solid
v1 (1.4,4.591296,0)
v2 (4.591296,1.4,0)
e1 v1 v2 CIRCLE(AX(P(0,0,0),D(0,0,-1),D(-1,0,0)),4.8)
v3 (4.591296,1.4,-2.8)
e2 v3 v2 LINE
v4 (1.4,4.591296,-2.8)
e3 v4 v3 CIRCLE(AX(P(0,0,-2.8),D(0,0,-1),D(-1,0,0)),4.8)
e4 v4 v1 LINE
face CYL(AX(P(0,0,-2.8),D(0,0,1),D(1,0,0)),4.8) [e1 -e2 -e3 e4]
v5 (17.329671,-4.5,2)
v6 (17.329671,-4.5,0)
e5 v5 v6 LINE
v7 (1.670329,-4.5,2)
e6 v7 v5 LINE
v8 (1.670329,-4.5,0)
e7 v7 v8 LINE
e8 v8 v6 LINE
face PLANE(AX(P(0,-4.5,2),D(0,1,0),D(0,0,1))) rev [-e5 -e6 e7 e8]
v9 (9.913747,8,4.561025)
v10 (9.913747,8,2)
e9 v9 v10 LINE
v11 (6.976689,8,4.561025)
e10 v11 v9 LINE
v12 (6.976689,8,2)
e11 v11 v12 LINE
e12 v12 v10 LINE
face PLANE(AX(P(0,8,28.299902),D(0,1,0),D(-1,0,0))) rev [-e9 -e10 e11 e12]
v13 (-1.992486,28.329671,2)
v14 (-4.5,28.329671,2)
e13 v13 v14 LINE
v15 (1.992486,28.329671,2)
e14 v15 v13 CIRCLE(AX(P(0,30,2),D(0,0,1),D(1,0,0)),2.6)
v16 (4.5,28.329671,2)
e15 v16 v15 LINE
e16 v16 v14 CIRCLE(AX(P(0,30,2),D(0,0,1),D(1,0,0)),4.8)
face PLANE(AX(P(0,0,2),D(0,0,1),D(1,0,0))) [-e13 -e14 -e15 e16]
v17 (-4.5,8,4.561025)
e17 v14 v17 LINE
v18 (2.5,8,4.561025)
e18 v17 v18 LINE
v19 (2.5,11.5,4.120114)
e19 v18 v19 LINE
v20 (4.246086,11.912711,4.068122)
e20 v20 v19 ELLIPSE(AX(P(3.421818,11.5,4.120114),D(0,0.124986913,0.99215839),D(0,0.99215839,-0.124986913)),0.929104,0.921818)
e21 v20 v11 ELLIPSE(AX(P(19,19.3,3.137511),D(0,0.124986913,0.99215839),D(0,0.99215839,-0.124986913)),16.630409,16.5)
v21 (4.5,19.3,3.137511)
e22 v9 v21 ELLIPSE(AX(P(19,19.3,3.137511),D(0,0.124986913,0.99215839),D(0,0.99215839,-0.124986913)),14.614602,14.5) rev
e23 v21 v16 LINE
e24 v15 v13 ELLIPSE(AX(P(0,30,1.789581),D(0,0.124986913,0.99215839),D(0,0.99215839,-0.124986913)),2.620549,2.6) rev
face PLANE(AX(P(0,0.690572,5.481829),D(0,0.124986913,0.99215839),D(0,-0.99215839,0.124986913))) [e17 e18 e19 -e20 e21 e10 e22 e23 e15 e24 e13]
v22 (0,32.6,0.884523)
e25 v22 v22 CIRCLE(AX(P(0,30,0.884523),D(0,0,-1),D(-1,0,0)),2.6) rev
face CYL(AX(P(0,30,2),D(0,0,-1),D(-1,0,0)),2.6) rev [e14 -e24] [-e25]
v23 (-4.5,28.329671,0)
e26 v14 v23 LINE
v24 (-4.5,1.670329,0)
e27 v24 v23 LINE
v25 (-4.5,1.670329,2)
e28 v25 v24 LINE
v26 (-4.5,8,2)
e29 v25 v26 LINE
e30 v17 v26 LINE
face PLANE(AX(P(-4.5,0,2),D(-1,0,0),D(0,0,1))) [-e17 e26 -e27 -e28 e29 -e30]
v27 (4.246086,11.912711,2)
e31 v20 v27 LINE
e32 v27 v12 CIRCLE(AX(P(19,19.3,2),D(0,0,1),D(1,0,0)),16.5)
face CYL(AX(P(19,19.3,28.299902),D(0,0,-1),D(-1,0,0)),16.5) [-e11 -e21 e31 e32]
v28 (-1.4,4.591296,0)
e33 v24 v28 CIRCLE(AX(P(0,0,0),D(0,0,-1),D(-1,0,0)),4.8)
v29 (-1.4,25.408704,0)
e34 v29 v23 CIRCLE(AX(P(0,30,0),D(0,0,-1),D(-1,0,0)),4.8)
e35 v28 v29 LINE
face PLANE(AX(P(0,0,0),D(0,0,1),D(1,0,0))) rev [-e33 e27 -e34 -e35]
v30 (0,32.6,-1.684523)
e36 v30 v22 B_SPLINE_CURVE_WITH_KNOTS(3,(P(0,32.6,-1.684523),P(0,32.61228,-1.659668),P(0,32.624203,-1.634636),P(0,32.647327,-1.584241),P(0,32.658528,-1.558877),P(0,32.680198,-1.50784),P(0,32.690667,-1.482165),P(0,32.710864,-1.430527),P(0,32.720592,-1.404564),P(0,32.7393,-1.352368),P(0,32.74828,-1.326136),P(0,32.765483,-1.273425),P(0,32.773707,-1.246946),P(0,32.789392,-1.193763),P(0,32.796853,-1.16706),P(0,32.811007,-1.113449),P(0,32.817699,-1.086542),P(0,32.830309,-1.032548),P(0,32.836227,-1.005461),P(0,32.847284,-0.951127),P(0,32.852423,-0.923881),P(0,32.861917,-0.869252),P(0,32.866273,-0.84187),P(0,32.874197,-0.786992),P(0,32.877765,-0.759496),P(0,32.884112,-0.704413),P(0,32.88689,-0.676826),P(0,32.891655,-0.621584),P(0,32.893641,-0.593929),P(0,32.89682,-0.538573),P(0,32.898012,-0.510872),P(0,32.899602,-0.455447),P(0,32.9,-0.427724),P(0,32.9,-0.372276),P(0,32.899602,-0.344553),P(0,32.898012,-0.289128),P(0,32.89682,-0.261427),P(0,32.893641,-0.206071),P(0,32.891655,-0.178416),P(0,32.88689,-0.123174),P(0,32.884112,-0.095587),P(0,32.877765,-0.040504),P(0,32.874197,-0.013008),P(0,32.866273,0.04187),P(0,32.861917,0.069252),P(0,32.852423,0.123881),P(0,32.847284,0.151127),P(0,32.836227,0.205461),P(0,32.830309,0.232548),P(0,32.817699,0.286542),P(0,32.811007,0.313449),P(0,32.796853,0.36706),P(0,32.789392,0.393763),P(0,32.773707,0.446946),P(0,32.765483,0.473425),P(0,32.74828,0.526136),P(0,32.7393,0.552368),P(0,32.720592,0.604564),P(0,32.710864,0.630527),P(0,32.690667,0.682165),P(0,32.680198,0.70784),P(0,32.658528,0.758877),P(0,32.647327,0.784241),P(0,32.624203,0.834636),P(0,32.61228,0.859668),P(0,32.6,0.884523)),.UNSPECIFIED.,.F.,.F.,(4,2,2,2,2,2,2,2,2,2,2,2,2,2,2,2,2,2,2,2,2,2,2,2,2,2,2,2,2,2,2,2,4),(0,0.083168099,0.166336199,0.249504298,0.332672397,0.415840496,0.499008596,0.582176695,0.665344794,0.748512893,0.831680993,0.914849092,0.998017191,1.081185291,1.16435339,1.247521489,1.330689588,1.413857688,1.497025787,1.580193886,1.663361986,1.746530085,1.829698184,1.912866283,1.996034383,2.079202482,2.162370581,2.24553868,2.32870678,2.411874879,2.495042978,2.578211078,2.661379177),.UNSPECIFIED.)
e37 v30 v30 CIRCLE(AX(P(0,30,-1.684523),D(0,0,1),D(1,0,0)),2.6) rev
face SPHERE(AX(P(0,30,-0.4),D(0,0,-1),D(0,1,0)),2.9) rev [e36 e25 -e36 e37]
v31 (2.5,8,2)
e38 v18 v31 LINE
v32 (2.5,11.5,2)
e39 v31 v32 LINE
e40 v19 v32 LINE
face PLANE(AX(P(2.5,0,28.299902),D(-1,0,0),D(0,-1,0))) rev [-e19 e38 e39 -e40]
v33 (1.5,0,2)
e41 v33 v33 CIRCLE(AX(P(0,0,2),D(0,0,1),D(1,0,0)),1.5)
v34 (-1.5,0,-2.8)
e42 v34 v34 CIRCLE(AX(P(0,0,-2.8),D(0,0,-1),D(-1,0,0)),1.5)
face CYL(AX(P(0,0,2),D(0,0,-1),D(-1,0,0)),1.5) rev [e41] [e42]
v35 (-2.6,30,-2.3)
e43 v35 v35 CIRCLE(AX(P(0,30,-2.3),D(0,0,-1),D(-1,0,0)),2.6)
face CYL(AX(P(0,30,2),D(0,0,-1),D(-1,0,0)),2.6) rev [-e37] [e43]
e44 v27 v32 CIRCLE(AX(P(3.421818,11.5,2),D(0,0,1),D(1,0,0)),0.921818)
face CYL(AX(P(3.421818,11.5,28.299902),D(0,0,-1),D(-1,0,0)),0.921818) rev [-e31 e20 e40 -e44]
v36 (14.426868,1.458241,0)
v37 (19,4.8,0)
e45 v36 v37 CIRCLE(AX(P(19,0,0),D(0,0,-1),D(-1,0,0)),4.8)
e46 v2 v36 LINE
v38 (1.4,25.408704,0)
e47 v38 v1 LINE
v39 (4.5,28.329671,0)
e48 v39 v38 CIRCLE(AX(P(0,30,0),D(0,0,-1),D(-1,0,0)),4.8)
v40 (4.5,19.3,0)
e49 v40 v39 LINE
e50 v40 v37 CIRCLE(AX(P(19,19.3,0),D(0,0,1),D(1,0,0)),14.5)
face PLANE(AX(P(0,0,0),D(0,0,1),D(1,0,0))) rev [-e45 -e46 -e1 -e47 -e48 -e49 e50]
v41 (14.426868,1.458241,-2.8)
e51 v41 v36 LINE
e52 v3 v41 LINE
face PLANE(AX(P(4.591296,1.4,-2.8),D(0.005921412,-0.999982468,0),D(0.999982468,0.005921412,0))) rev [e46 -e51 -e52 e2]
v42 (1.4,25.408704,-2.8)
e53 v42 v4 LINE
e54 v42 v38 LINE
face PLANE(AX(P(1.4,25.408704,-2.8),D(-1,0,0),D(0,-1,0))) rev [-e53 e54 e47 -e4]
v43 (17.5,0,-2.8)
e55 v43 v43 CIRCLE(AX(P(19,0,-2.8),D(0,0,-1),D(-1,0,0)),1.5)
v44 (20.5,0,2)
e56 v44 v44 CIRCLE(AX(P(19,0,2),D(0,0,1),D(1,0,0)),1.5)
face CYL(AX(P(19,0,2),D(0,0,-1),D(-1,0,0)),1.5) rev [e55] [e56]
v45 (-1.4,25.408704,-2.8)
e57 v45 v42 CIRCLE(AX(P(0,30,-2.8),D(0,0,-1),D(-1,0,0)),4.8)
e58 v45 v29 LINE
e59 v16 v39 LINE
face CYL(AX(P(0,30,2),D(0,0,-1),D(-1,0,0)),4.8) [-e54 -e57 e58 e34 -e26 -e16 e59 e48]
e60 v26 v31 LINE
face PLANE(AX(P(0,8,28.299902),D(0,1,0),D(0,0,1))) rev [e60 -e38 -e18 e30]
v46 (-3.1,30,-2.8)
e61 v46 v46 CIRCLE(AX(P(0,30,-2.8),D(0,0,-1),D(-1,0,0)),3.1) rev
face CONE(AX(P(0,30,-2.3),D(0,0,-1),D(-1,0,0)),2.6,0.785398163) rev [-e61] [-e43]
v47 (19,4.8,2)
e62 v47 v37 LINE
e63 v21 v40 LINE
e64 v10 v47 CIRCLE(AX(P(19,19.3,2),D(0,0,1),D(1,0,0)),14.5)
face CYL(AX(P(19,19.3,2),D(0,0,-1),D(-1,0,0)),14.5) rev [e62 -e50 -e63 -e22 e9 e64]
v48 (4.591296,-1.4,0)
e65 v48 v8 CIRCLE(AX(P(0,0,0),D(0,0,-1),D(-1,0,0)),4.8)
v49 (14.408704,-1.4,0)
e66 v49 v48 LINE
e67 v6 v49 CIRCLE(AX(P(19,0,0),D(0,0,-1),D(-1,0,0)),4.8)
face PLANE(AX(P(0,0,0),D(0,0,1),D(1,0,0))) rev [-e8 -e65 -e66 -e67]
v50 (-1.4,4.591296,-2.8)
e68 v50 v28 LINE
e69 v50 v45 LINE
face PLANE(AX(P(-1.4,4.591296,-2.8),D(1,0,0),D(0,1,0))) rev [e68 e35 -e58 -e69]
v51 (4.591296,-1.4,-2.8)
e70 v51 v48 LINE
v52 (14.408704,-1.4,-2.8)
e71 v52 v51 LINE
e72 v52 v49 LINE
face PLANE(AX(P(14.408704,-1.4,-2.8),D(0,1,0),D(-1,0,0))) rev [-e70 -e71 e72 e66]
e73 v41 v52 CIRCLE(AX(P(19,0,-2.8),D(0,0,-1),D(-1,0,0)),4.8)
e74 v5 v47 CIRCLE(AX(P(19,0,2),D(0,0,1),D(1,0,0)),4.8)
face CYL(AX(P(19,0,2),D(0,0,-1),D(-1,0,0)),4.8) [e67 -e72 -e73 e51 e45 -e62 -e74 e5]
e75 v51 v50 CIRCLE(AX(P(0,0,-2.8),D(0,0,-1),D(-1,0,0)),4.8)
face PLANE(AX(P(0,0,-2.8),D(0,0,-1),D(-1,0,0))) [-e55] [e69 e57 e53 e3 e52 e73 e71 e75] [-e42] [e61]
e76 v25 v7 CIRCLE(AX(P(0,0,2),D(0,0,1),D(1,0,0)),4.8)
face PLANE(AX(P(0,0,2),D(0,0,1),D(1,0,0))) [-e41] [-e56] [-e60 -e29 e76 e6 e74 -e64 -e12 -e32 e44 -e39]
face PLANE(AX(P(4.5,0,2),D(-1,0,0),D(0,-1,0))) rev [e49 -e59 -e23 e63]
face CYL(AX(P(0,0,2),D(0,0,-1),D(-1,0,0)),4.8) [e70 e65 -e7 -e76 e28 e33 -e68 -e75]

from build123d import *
from build123d.topology import SkipClean

# Parameters (mm, degrees)
SKETCH_1_R            = 1.5
SKETCH_1_R_2          = 2.6
EXTRUDE_1_DEPTH       = 2
EXTRUDE_START         = 2.8
SKETCH_7_R            = 1.5
SKETCH_7_R_2          = 2.6
EXTRUDE_4_DEPTH       = 2.8
EXTRUDE_START_2       = -4.5
EXTRUDE_5_DEPTH       = 7
EXTRUDE_START_3       = 2.5
EXTRUDE_5_2_DEPTH     = 7.413746647
EXTRUDE_START_4       = 2
EXTRUDE_5_3_OUTLINE_R = 1.5
EXTRUDE_5_3_DEPTH     = 4
CHAMFER_1_SIZE        = 0.5


with BuildPart() as part:
    # 草图1 → 凸台-拉伸1 (new body)
    with BuildSketch(Plane.XY):
        with BuildLine():
            Line((4.5, 19.3), (4.5, 28.329670691))
            ThreePointArc((4.5, 28.329670691), (0, 34.8), (-4.5, 28.329670691))
            Line((-4.5, 28.329670691), (-4.5, 1.670329309))
            ThreePointArc((-4.5, 1.670329309), (-3.39411255, -3.39411255), (1.670329309, -4.5))
            Line((1.670329309, -4.5), (17.329670691, -4.5))
            ThreePointArc((17.329670691, -4.5), (23.724404724, -0.848528137), (19, 4.8))
            ThreePointArc((19, 4.8), (8.746951673, 9.046951673), (4.5, 19.3))
        make_face()
        Circle(SKETCH_1_R, mode=Mode.SUBTRACT)
        with Locations((19, 0)):
            Circle(SKETCH_1_R, mode=Mode.SUBTRACT)
        with Locations((0, 30)):
            Circle(SKETCH_1_R_2, mode=Mode.SUBTRACT)
    extrude(amount=EXTRUDE_1_DEPTH)

    # 草图7 → 凸台-拉伸4 (add)
    with BuildSketch(Plane(origin=(0, 0, 0), x_dir=(-1, 0, 0), z_dir=(0, 0, -1)).offset(EXTRUDE_START)):
        with BuildLine():
            Line((-14.408703887, -1.4), (-4.591296113, -1.4))
            ThreePointArc((-4.591296113, -1.4), (3.39411255, -3.39411255), (1.4, 4.591296113))
            Line((1.4, 4.591296113), (1.4, 25.408703887))
            ThreePointArc((1.4, 25.408703887), (0, 34.8), (-1.4, 25.408703887))
            Line((-1.4, 25.408703887), (-1.4, 4.591296113))
            ThreePointArc((-1.4, 4.591296113), (-3.39411255, 3.39411255), (-4.591296113, 1.4))
            Line((-4.591296113, 1.4), (-14.426868498, 1.458241497))
            ThreePointArc((-14.426868498, 1.458241497), (-23.799903071, -0.030504201), (-14.408703887, -1.4))
        make_face()
        Circle(SKETCH_7_R, mode=Mode.SUBTRACT)
        with Locations((-19, 0)):
            Circle(SKETCH_7_R, mode=Mode.SUBTRACT)
        with Locations((0, 30)):
            Circle(SKETCH_7_R_2, mode=Mode.SUBTRACT)
    extrude(amount=-EXTRUDE_4_DEPTH)

    # 凸台-拉伸5: read off the stored shape, not the designer's step
    # 凸台-拉伸5 outline → 凸台-拉伸5 (add)
    with SkipClean():  # the faces are left unmerged after this step: merging them gives an invalid solid
        with BuildSketch(Plane.YZ.offset(EXTRUDE_START_2)):
            Polygon((8, 2), (28.329670691, 2), (8, 4.561025334), align=None)
        extrude(amount=EXTRUDE_5_DEPTH)
    add(part.part.scale(1), mode=Mode.REPLACE)  # the faces are merged on a copy

    # Extrude 5 2 outline → Extrude 5 2 (add)
    with SkipClean():  # the faces are left unmerged after this step: merging them gives an invalid solid
        with BuildSketch(Plane.YZ.offset(EXTRUDE_START_3)):
            Polygon((8, 2), (28.329670691, 2), (8, 4.561025334), align=None)
        extrude(amount=EXTRUDE_5_2_DEPTH)

    # Extrude 5 3 outline → Extrude 5 3 (cut)
    # profile 1 of 3: a face of its own
    with SkipClean():  # the faces are left unmerged after this step: merging them gives an invalid solid
        with BuildSketch(Plane.XY.offset(EXTRUDE_START_4)):
            with BuildLine():
                Line((2.5, 11.5), (2.5, 8))
                Line((2.5, 8), (-4.5, 8))
                Line((-4.5, 8), (-4.5, 1.670329309))
                ThreePointArc((-4.5, 1.670329309), (-3.39411255, -3.39411255), (1.670329309, -4.5))
                Line((1.670329309, -4.5), (17.329670691, -4.5))
                ThreePointArc((17.329670691, -4.5), (23.724404724, -0.848528137), (19, 4.8))
                ThreePointArc((19, 4.8), (14.183362168, 5.62337761), (9.913746647, 8))
                Line((9.913746647, 8), (6.976689308, 8))
                ThreePointArc((6.976689308, 8), (5.469210572, 9.857132985), (4.246086412, 11.912711334))
                ThreePointArc((4.246086412, 11.912711334), (3.209776536, 12.39709927), (2.5, 11.5))
            make_face()
            Circle(EXTRUDE_5_3_OUTLINE_R, mode=Mode.SUBTRACT)
            with Locations((19, 0)):
                Circle(EXTRUDE_5_3_OUTLINE_R, mode=Mode.SUBTRACT)
        # profile 2 of 3: a face of its own
        with BuildSketch(Plane.XY.offset(EXTRUDE_START_4)):
            with BuildLine():
                ThreePointArc((4.5, 19.3), (5.923290291, 13.035044837), (9.913746647, 8))
                Line((9.913746647, 8), (9.913746647, 28.329670691))
                Line((9.913746647, 28.329670691), (4.5, 28.329670691))
                Line((4.5, 28.329670691), (4.5, 19.3))
            make_face()
        # profile 3 of 3: a face of its own
        with BuildSketch(Plane.XY.offset(EXTRUDE_START_4)):
            with BuildLine():
                Line((1.992485884, 28.329670691), (-1.992485884, 28.329670691))
                ThreePointArc((-1.992485884, 28.329670691), (0, 27.4), (1.992485884, 28.329670691))
            make_face()
        extrude(amount=EXTRUDE_5_3_DEPTH, mode=Mode.SUBTRACT)

    # 草图11 → 切除-旋转1 (revolve, cut)
    with SkipClean():  # the faces are left unmerged after this step: merging them gives an invalid solid
        with BuildSketch(Plane(origin=(0, 0, 0), x_dir=(0, 0, -1), z_dir=(1, 0, 0)), mode=Mode.PRIVATE) as cut_revolve_1_sk:
            with BuildLine():
                Line((3.254540001, 30.511469826), (-2.454540001, 30.511469826))
                ThreePointArc((-2.454540001, 30.511469826), (0.4, 32.9), (3.254540001, 30.511469826))
            make_face()
        revolve(cut_revolve_1_sk.sketch.rotate(Axis((0, 30, -2.8), (0, 0, 1)), 90), axis=Axis((0, 30, -2.8), (0, 0, 1)), mode=Mode.SUBTRACT)

    # 倒角1
    chamfer_1_edges = [part.edges().sort_by_distance(p)[0] for p in [
        (2.6, 30, -2.8),
    ]]
    chamfer(chamfer_1_edges, length=CHAMFER_1_SIZE)


solid = part.part
